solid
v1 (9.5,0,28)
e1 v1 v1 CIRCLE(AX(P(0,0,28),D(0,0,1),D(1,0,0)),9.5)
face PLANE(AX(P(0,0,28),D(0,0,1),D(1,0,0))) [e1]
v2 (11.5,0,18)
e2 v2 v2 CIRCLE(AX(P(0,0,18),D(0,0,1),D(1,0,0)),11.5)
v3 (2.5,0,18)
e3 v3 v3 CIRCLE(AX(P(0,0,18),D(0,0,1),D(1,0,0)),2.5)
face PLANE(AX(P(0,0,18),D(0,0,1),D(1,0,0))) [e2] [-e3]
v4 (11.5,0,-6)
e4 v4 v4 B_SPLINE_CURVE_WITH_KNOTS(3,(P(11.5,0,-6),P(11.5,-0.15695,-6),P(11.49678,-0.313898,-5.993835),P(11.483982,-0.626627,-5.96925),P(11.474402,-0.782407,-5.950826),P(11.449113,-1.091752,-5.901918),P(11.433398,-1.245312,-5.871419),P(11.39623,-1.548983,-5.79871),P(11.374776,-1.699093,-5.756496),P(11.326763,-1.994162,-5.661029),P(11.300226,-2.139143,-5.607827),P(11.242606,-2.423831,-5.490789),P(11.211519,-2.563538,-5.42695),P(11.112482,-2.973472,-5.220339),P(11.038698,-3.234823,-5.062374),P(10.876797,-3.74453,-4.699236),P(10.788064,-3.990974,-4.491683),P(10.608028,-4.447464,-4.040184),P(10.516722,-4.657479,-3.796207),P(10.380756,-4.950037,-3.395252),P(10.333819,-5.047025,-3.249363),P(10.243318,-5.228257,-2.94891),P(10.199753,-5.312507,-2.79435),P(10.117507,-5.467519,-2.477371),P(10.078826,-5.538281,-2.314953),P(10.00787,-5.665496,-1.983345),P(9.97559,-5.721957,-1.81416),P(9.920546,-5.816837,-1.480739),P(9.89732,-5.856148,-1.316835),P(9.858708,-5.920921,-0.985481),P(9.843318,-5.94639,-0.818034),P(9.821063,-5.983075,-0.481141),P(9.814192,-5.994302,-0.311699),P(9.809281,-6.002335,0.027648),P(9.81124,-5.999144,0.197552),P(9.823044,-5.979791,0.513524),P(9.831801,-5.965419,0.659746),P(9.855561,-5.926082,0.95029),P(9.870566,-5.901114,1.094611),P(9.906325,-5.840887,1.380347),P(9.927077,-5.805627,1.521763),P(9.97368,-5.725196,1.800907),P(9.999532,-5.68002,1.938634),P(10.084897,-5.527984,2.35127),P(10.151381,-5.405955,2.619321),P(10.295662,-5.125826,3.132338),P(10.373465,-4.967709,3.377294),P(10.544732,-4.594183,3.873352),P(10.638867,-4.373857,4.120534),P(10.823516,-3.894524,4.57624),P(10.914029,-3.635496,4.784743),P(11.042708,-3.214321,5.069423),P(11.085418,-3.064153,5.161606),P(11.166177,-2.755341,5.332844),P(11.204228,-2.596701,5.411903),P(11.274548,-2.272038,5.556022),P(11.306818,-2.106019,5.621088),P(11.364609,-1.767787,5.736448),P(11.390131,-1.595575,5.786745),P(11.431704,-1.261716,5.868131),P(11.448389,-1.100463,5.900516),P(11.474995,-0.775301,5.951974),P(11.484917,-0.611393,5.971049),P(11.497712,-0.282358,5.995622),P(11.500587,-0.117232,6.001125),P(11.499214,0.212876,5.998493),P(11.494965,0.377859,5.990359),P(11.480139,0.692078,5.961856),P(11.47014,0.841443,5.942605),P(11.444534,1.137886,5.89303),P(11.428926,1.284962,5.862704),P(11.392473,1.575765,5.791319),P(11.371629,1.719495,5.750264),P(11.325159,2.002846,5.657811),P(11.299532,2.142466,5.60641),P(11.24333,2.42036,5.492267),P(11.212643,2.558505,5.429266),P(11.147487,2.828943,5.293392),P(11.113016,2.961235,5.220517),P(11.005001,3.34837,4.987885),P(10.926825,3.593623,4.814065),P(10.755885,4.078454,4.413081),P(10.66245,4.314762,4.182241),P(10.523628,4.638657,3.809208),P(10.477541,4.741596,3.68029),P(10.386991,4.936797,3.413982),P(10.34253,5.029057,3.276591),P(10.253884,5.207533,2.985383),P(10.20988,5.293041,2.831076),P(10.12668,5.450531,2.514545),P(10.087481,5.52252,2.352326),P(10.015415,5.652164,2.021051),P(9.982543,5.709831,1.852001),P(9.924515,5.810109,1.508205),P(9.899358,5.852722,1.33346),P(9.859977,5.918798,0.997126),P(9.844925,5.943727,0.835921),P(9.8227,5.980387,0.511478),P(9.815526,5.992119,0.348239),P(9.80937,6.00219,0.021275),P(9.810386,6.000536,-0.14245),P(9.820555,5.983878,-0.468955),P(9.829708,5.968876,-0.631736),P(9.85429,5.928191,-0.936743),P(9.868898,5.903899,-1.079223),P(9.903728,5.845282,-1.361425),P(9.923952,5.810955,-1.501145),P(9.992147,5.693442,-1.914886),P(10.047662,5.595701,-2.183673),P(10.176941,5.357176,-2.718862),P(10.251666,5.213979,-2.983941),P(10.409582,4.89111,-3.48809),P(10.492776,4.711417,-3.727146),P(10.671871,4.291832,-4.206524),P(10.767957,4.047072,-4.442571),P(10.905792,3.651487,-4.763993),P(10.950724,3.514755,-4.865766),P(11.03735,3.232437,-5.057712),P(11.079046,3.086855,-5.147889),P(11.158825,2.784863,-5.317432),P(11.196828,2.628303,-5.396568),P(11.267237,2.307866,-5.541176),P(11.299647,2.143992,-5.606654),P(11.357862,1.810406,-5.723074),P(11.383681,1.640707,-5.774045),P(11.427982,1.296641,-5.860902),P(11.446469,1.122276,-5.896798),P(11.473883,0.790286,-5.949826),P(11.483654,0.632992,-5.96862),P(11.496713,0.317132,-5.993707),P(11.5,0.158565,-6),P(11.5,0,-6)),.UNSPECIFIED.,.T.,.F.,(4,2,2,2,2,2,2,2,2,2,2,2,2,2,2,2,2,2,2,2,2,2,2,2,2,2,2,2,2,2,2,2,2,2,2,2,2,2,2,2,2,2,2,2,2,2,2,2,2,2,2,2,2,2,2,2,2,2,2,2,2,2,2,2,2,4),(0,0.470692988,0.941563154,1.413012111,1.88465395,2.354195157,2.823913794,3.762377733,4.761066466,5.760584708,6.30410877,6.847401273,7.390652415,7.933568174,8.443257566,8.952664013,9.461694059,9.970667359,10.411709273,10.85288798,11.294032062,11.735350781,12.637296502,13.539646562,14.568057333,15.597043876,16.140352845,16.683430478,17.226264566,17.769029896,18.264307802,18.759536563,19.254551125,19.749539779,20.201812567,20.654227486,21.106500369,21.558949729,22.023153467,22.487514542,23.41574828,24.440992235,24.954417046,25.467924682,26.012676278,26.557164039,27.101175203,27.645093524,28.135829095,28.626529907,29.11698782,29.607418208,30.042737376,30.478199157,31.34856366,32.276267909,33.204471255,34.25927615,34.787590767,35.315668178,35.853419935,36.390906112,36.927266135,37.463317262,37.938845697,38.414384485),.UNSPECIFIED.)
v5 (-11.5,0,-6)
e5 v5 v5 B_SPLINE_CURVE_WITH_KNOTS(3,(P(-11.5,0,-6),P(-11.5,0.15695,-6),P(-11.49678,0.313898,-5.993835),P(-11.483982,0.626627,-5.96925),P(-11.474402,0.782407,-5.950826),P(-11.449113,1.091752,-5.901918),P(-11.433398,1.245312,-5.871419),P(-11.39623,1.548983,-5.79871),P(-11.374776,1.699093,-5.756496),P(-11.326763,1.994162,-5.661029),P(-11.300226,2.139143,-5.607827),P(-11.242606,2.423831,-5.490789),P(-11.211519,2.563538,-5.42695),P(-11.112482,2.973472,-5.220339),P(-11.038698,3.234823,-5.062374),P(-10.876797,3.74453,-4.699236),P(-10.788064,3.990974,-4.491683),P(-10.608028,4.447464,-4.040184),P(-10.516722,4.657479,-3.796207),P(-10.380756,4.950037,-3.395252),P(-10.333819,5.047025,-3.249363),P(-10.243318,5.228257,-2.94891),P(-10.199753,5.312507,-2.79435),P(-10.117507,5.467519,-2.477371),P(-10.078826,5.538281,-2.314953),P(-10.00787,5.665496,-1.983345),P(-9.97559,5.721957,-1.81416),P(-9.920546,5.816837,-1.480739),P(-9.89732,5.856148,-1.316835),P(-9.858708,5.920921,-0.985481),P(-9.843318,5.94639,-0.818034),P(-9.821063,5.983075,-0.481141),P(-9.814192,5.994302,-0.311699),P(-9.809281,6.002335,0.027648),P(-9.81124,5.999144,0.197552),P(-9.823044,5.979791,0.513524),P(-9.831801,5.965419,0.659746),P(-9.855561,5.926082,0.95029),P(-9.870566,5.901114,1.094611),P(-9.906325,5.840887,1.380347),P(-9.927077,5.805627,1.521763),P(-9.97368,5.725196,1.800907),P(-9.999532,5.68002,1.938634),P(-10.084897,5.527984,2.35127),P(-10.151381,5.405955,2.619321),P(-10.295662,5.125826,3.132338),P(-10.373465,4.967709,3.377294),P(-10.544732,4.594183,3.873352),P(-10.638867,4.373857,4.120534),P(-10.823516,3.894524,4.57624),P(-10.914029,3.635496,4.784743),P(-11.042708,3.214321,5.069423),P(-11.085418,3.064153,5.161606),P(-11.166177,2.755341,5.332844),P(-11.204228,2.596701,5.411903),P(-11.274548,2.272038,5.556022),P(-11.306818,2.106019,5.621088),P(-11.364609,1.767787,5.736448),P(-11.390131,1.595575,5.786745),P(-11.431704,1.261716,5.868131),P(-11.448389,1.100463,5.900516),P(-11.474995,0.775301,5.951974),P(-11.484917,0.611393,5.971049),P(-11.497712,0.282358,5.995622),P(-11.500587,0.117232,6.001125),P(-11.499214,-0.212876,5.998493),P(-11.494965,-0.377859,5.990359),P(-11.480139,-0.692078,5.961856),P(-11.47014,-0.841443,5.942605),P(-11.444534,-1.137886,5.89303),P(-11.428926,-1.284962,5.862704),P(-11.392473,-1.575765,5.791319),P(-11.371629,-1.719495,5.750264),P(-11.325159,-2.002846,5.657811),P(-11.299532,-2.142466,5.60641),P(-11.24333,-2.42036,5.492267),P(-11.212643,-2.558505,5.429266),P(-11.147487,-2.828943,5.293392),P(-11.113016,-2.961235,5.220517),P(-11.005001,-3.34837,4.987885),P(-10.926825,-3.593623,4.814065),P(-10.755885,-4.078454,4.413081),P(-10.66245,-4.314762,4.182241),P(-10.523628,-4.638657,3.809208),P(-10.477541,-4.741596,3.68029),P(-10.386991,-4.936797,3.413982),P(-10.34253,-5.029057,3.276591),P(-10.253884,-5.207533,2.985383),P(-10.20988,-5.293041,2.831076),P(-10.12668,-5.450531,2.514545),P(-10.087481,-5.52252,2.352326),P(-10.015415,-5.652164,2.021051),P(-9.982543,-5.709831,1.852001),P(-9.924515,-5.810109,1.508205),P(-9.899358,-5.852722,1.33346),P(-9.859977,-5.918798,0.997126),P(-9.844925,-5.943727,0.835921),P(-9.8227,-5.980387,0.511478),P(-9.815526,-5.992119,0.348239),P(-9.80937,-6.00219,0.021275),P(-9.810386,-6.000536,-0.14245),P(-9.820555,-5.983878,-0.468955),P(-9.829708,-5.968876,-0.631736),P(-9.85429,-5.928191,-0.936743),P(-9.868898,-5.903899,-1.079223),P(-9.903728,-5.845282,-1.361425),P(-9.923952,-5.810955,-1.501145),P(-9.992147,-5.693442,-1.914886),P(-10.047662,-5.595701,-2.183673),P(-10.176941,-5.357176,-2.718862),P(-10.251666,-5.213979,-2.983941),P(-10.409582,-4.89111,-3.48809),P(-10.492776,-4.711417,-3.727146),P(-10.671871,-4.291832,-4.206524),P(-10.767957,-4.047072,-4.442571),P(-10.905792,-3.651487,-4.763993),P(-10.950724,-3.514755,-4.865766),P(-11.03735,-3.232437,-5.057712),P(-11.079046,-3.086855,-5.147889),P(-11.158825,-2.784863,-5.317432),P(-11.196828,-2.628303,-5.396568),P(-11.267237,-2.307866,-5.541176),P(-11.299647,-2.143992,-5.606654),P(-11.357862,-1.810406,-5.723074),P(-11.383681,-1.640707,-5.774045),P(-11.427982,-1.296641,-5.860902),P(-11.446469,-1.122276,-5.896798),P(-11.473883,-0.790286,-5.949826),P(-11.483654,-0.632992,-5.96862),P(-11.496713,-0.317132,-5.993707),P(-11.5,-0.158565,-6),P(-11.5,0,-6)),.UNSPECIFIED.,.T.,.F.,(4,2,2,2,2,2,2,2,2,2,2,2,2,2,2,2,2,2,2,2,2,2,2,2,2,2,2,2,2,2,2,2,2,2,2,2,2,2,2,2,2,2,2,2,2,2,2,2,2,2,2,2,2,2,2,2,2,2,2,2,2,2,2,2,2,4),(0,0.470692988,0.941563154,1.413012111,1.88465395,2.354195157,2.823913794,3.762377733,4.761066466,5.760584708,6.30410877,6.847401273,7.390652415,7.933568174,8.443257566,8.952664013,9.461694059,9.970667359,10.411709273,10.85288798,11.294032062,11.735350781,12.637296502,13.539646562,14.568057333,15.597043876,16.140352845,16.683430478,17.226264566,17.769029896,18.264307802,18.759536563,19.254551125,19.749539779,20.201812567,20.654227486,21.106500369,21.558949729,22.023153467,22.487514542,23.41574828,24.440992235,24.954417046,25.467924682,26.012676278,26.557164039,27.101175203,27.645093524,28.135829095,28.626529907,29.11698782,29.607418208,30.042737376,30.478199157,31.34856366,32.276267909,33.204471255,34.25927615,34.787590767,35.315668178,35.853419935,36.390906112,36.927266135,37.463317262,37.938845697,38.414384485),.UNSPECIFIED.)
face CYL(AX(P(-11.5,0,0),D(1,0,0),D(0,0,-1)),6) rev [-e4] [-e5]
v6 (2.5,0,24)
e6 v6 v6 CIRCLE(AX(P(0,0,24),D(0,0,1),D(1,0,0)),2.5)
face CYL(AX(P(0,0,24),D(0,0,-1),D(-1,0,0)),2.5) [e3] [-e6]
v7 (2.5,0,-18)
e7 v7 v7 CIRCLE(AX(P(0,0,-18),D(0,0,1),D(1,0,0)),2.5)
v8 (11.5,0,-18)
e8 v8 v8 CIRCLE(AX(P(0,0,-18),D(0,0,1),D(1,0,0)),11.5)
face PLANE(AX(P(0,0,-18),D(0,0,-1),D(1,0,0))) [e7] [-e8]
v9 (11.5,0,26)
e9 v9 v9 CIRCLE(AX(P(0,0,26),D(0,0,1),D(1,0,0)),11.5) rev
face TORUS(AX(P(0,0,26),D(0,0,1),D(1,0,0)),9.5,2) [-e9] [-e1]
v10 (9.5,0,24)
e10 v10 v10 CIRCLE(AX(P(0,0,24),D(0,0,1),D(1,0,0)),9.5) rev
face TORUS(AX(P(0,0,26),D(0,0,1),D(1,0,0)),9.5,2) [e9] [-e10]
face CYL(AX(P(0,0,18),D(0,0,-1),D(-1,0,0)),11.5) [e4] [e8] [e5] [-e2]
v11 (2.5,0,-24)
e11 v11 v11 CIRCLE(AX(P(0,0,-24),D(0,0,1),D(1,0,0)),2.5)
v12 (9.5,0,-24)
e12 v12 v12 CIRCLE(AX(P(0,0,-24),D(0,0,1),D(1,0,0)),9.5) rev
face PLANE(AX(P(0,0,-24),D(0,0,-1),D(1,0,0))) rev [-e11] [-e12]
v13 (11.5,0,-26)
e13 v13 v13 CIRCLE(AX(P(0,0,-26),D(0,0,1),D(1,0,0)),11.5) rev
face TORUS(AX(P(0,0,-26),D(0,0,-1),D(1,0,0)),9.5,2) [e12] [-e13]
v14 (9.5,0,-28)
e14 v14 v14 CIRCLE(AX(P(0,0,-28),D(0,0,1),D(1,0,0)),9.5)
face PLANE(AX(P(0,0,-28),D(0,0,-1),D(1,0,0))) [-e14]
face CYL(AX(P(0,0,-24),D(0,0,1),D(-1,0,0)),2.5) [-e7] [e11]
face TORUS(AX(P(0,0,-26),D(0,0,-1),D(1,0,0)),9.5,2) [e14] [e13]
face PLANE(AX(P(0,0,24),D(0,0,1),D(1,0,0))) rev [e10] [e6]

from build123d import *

# Parameters (mm, degrees)
SKETCH1_R               = 11.5
BOSS_EXTRUDE1_DEPTH     = 18
SKETCH2_R               = 2.5
BOSS_EXTRUDE2_DEPTH     = 6
SKETCH3_R               = 11.5
BOSS_EXTRUDE3_DEPTH     = 4
FILLET1_R               = 2
CUT_EXTRUDE2_DEPTH      = 33.380549753
CUT_EXTRUDE2_DEPTH_BACK = 33.380549753
SKETCH5_R               = 6


with BuildPart() as part:
    # Sketch1 → Boss-Extrude1 (new body)
    with BuildSketch(Plane.XY):
        Circle(SKETCH1_R)
    extrude(amount=BOSS_EXTRUDE1_DEPTH)

    # Sketch2 → Boss-Extrude2 (add)
    with BuildSketch(Plane.XY.offset(18)):
        Circle(SKETCH2_R)
    extrude(amount=BOSS_EXTRUDE2_DEPTH)

    # Sketch3 → Boss-Extrude3 (add)
    with BuildSketch(Plane.XY.offset(24)):
        Circle(SKETCH3_R)
    extrude(amount=BOSS_EXTRUDE3_DEPTH)

    # Fillet1
    fillet1_edges = [part.edges().sort_by_distance(p)[0] for p in [
        (-11.5, 0, 24),
        (-11.5, 0, 28),
    ]]
    fillet(fillet1_edges, radius=FILLET1_R - 0.0001)  # a hair under: the kernel refuses the full size

    # Mirror1: part across plane


with BuildPart() as part_1:
    add(part.part)
    add(part.part.mirror(Plane.XY))

    # Sketch5 → Cut-Extrude2 (cut, two sides: drawn at the far end of the back side and taken through both)
    with BuildSketch(Plane(origin=(0, 0, 0), x_dir=(0, 0, -1), z_dir=(1, 0, 0)).offset(-CUT_EXTRUDE2_DEPTH_BACK)):
        Circle(SKETCH5_R)
    extrude(amount=CUT_EXTRUDE2_DEPTH + CUT_EXTRUDE2_DEPTH_BACK, mode=Mode.SUBTRACT)


solid = part_1.part
